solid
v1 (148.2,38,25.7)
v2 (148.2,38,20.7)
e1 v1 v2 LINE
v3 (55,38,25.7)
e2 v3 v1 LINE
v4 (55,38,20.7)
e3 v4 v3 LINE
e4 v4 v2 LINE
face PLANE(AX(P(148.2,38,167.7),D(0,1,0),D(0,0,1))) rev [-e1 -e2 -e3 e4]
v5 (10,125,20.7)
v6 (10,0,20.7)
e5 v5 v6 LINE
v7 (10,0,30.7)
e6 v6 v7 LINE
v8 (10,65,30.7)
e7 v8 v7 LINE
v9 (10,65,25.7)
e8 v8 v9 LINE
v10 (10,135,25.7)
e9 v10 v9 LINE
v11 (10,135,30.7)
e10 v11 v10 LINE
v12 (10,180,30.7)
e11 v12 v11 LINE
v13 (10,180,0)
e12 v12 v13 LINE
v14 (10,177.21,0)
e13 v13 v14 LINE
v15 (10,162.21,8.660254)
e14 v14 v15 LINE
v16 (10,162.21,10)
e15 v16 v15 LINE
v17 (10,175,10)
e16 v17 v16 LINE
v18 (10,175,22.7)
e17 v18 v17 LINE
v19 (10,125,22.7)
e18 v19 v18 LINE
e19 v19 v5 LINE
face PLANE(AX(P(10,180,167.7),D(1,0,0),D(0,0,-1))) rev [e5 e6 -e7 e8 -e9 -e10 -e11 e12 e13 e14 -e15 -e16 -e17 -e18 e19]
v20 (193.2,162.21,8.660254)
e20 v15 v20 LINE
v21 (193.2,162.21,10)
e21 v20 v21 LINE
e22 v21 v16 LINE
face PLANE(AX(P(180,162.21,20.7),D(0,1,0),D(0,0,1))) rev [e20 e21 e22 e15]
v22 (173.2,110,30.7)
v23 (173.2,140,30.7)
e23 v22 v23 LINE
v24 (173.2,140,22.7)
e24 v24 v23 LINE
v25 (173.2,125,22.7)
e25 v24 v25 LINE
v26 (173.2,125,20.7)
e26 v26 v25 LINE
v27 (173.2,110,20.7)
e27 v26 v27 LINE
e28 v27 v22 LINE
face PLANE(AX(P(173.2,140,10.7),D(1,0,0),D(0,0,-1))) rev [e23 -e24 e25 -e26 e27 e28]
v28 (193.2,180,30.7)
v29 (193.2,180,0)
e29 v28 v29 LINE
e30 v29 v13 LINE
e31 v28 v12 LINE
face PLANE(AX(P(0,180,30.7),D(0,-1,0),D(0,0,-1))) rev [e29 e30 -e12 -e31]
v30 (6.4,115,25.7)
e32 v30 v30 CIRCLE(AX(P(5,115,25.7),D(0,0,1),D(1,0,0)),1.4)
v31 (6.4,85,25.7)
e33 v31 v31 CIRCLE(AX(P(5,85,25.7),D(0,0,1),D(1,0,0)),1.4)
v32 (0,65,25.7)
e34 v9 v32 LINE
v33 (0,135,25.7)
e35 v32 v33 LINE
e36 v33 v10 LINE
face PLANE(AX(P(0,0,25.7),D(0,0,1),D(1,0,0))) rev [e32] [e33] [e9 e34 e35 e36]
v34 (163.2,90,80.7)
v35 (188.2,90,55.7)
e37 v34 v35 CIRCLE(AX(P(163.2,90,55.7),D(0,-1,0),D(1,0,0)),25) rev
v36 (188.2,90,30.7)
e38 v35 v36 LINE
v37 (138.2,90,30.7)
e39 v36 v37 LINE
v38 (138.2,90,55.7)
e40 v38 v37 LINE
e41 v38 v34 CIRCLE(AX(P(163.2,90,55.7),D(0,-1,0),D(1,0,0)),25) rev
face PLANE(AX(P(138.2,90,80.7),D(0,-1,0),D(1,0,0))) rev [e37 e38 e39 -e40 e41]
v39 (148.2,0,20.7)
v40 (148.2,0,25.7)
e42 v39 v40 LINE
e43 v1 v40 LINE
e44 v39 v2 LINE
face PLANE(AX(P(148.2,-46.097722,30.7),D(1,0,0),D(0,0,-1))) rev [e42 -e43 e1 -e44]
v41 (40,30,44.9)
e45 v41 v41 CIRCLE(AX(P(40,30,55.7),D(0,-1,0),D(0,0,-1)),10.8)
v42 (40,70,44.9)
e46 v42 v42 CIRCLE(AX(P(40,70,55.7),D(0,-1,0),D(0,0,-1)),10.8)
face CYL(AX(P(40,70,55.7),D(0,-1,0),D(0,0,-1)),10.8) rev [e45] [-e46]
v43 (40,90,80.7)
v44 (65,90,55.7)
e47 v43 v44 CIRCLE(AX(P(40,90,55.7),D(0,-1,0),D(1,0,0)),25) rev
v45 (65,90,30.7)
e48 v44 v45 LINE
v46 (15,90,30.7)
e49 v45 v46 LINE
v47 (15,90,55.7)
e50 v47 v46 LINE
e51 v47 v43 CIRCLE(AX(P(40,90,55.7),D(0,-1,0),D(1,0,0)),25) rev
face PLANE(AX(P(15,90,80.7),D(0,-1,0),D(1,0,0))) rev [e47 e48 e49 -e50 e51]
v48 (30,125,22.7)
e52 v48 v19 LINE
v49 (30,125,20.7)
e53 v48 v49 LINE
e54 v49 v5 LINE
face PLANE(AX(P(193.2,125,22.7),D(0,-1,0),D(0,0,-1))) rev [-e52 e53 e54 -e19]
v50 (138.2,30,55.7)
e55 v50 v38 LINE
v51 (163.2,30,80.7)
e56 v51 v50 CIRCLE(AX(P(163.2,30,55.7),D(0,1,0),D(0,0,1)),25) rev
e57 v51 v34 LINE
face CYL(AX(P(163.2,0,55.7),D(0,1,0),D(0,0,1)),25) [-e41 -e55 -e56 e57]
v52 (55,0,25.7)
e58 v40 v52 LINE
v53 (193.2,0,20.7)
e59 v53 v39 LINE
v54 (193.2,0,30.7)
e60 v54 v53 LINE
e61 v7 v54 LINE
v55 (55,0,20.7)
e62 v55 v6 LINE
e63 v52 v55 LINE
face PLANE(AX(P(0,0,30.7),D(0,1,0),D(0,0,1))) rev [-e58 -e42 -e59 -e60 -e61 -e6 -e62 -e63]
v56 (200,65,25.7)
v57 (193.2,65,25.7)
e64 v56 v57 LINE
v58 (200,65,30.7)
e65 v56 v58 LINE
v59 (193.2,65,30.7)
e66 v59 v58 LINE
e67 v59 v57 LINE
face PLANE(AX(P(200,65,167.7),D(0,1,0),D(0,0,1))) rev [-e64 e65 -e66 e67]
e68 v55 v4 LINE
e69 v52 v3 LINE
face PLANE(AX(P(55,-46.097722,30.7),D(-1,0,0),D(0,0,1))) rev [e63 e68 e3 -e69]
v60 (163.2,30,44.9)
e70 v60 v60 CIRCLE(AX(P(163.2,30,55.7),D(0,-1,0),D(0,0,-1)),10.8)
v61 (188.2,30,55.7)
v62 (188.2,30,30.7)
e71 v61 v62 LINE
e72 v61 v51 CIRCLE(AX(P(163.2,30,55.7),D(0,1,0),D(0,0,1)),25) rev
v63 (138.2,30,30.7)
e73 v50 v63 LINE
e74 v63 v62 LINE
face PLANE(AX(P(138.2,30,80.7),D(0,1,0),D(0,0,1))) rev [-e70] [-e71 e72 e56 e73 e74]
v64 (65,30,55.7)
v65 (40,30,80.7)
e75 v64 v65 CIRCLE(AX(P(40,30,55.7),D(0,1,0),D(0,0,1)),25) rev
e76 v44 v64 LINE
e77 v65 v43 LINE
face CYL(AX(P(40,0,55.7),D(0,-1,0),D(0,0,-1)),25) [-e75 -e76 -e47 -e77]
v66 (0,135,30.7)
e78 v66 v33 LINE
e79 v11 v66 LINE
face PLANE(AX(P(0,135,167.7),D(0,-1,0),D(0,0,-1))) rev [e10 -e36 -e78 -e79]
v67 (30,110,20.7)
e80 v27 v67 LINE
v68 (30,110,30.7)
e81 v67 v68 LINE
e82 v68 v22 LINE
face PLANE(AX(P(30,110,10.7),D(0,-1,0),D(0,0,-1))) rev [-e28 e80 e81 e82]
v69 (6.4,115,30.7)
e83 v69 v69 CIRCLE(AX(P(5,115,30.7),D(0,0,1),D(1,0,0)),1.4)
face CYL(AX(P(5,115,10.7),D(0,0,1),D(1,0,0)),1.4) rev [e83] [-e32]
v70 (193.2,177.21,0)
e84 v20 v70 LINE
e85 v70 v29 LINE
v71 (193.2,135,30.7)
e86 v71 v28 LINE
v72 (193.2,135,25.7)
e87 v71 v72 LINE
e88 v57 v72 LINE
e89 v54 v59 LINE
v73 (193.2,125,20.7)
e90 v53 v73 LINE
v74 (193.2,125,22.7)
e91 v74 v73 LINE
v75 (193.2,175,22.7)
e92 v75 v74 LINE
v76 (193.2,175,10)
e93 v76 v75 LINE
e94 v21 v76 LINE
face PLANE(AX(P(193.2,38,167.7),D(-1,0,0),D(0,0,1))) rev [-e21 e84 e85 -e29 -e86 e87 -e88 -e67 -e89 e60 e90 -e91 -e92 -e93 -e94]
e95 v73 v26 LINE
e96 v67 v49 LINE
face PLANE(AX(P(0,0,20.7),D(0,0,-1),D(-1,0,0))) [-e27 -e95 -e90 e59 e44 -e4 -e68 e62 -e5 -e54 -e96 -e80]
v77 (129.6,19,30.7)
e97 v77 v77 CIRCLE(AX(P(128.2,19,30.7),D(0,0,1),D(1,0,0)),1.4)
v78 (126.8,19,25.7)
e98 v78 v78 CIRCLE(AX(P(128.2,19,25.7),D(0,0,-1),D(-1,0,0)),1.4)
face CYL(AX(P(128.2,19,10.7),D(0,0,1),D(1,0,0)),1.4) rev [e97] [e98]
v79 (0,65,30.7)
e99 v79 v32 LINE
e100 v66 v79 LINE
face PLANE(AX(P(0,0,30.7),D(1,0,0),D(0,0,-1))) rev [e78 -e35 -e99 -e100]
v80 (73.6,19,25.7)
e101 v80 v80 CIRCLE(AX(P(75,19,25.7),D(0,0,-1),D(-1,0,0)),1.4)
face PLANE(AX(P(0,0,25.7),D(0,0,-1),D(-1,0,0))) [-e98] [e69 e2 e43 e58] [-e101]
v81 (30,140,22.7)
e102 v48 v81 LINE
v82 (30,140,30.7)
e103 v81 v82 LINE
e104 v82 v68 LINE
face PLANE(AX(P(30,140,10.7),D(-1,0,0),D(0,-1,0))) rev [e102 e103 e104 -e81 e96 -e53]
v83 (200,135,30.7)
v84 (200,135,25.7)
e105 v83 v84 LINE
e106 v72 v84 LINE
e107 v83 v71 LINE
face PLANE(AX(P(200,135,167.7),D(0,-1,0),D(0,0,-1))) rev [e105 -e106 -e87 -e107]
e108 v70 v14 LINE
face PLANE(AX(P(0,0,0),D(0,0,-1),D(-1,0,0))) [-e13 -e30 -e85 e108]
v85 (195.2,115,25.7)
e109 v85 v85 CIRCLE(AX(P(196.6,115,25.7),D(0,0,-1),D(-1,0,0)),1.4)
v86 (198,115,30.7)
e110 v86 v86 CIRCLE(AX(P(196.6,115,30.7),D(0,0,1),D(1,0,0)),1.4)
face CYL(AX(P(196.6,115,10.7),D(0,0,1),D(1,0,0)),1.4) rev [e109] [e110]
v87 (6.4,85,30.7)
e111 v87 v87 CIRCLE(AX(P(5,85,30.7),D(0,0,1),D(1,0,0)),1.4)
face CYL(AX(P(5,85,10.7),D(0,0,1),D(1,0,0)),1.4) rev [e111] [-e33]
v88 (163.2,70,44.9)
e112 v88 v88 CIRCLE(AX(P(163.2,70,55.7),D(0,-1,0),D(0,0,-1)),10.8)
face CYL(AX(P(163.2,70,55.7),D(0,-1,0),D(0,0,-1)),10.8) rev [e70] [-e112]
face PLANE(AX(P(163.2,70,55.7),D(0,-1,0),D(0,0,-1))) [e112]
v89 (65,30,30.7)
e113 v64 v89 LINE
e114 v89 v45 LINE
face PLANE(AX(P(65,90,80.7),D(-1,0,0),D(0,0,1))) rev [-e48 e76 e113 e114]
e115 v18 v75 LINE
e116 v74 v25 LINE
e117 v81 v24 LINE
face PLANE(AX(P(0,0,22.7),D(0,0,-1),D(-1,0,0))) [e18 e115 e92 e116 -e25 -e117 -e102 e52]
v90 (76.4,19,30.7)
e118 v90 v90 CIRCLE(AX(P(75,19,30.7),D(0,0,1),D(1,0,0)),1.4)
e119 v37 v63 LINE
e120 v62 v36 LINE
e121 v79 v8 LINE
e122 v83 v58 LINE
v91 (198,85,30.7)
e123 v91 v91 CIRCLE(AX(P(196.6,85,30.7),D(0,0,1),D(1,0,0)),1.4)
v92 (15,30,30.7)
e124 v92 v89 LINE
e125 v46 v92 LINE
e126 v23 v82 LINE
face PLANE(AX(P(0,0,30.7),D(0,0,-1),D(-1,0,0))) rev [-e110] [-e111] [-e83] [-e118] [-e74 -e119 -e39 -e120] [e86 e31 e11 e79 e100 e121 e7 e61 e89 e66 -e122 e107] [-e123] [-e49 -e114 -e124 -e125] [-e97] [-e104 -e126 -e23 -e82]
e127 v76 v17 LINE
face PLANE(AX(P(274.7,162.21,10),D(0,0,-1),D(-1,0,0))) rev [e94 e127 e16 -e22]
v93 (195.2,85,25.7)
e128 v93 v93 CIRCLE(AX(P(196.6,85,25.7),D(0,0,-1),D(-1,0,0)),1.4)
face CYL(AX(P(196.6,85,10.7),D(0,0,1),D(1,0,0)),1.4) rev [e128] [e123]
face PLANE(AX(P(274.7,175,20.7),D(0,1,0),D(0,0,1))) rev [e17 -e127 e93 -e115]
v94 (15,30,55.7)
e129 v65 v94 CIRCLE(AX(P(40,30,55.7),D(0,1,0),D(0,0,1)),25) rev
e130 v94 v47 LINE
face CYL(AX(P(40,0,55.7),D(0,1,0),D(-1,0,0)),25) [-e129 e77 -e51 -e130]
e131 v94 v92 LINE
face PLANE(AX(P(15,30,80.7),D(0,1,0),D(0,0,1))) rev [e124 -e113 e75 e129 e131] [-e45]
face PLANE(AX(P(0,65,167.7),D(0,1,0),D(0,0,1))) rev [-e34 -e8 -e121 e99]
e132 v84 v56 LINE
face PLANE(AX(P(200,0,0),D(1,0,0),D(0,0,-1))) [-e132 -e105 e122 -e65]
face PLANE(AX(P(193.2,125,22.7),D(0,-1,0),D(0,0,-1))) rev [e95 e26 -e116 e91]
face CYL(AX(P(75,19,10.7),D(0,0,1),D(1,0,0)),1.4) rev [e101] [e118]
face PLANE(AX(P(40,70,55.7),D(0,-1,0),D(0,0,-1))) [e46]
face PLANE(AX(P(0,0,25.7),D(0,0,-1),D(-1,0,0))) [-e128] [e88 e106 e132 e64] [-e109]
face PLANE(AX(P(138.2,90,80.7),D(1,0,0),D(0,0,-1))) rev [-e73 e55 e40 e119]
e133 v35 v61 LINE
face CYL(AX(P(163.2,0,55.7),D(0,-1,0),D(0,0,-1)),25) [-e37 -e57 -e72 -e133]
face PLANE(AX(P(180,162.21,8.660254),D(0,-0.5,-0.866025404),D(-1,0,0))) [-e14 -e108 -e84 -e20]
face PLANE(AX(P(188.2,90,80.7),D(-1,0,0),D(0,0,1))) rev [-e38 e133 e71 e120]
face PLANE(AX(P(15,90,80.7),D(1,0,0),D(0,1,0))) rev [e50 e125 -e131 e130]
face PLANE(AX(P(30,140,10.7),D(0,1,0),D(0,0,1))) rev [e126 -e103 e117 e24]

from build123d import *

# Parameters (mm, degrees)
CROQUIS1_W                 = 180
CROQUIS1_H                 = 180
SALIENTE_EXTRUIR1_DEPTH    = 30.7
CROQUIS2_W                 = 180
CROQUIS2_H                 = 162.21
CORTAR_EXTRUIR1_DEPTH      = 20.7
CROQUIS3_W                 = 10.7
CROQUIS3_H                 = 12.79
CORTAR_EXTRUIR2_DEPTH      = 274.7
SALIENTE_EXTRUIR2_DEPTH    = 20
CORTAR_EXTRUIR3_DEPTH      = 147
CORTAR_EXTRUIR3_DEPTH_BACK = 147
CROQUIS5_W                 = 10
CROQUIS5_H                 = 45
CROQUIS5_W_2               = 6.8
CROQUIS6_W                 = 93.2
CROQUIS6_H                 = 38
CROQUIS6_W_2               = 6.8
CROQUIS6_H_2               = 70
CROQUIS6_W_3               = 10
CORTAR_EXTRUIR4_DEPTH      = 5
CROQUIS7_W                 = 183.2
CROQUIS7_H                 = 50
CORTAR_EXTRUIR5_DEPTH      = 2
CROQUIS8_W                 = 45
CROQUIS8_H                 = 10
SALIENTE_EXTRUIR3_DEPTH    = 38
CROQUIS9_R                 = 1.4
CROQUIS9_W                 = 143.2
CROQUIS9_H                 = 30
CORTAR_EXTRUIR6_DEPTH      = 20
CHAFL_N1_SIZE              = 15
CHAFL_N1_SIZE2             = 8.660254038
CROQUIS10_W                = 50
CROQUIS10_H                = 60
SALIENTE_EXTRUIR4_DEPTH    = 50
REDONDEO1_R                = 25
CROQUIS11_R                = 10.8
CORTAR_EXTRUIR7_DEPTH      = 40


with BuildPart() as part:
    # Croquis1 → Saliente-Extruir1 (new body)
    with BuildSketch(Plane.XY):
        with Locations((90, 90)):
            Rectangle(CROQUIS1_W, CROQUIS1_H)
    extrude(amount=SALIENTE_EXTRUIR1_DEPTH)

    # Croquis2 → Cortar-Extruir1 (cut)
    with BuildSketch(Plane(origin=(0, 0, 0), x_dir=(-1, 0, 0), z_dir=(0, 0, -1))):
        with Locations((-90, 81.105)):
            Rectangle(CROQUIS2_W, CROQUIS2_H)
    extrude(amount=-CORTAR_EXTRUIR1_DEPTH, mode=Mode.SUBTRACT)

    # Croquis3 → Cortar-Extruir2 (cut)
    with BuildSketch(Plane.ZY):
        with Locations((15.35, 168.605)):
            Rectangle(CROQUIS3_W, CROQUIS3_H)
    extrude(amount=-CORTAR_EXTRUIR2_DEPTH, mode=Mode.SUBTRACT)

    # Croquis4 → Saliente-Extruir2 (add)
    with BuildSketch(Plane(origin=(180, 0, 0), x_dir=(0, 0, -1), z_dir=(1, 0, 0))):
        Polygon((-20.7, 0), (-20.7, 175), (-10, 175), (-10, 162.21), (0, 162.21), (0, 180), (-30.7, 180), (-30.7, 0), align=None)
    extrude(amount=SALIENTE_EXTRUIR2_DEPTH)

    # Croquis5 → Cortar-Extruir3 (cut, two sides: drawn at the far end of the back side and taken through both)
    with BuildSketch(Plane(origin=(0, 0, 20.7), x_dir=(-1, 0, 0), z_dir=(0, 0, -1)).offset(-CORTAR_EXTRUIR3_DEPTH_BACK)):
        Polygon((-55, 38), (-10, 38), (-10, 65), (0, 65), (0, 38), (0, 0), (-55, 0), align=None)
        Polygon((-148.2, 38), (-193.2, 38), (-193.2, 65), (-200, 65), (-200, 38), (-200, 0), (-148.2, 0), align=None)
        with Locations((-5, 157.5)):
            Rectangle(CROQUIS5_W, CROQUIS5_H)
        with Locations((-196.6, 157.5)):
            Rectangle(CROQUIS5_W_2, CROQUIS5_H)
    extrude(amount=CORTAR_EXTRUIR3_DEPTH + CORTAR_EXTRUIR3_DEPTH_BACK, mode=Mode.SUBTRACT)

    # Croquis6 → Cortar-Extruir4 (cut)
    with BuildSketch(Plane(origin=(0, 0, 20.7), x_dir=(-1, 0, 0), z_dir=(0, 0, -1))):
        with Locations((-101.6, 19)):
            Rectangle(CROQUIS6_W, CROQUIS6_H)
        with Locations((-196.6, 100)):
            Rectangle(CROQUIS6_W_2, CROQUIS6_H_2)
        with Locations((-5, 100)):
            Rectangle(CROQUIS6_W_3, CROQUIS6_H_2)
    extrude(amount=-CORTAR_EXTRUIR4_DEPTH, mode=Mode.SUBTRACT)

    # Croquis7 → Cortar-Extruir5 (cut)
    with BuildSketch(Plane(origin=(0, 0, 20.7), x_dir=(-1, 0, 0), z_dir=(0, 0, -1))):
        with Locations((-101.6, 150)):
            Rectangle(CROQUIS7_W, CROQUIS7_H)
    extrude(amount=-CORTAR_EXTRUIR5_DEPTH, mode=Mode.SUBTRACT)

    # Croquis8 → Saliente-Extruir3 (add)
    with BuildSketch(Plane.XZ.offset(-38)):
        with Locations((32.5, 25.7)):
            Rectangle(CROQUIS8_W, CROQUIS8_H)
        with Locations((170.7, 25.7)):
            Rectangle(CROQUIS8_W, CROQUIS8_H)
    extrude(amount=SALIENTE_EXTRUIR3_DEPTH)

    # Croquis9 → Cortar-Extruir6 (cut)
    with BuildSketch(Plane.XY.offset(30.7)):
        with Locations((5, 115)):
            Circle(CROQUIS9_R)
        with Locations((5, 85)):
            Circle(CROQUIS9_R)
        with Locations((196.6, 115)):
            Circle(CROQUIS9_R)
        with Locations((196.6, 85)):
            Circle(CROQUIS9_R)
        with Locations((128.2, 19)):
            Circle(CROQUIS9_R)
        with Locations((75, 19)):
            Circle(CROQUIS9_R)
        with Locations((101.6, 125)):
            Rectangle(CROQUIS9_W, CROQUIS9_H)
    extrude(amount=-CORTAR_EXTRUIR6_DEPTH, mode=Mode.SUBTRACT)

    # Chaflán1
    chafl_n1_edges = [part.edges().sort_by_distance(p)[0] for p in [
        (101.6, 162.21, 0),
    ]]
    chafl_n1_side = [part.faces().sort_by_distance(p)[0] for p in [
        (101.6, 171.105, 0),
    ]]
    chamfer(chafl_n1_edges, length=CHAFL_N1_SIZE, length2=CHAFL_N1_SIZE2, reference=chafl_n1_side[0])

    # Croquis10 → Saliente-Extruir4 (add)
    with BuildSketch(Plane.XY.offset(30.7)):
        with Locations((163.2, 60)):
            Rectangle(CROQUIS10_W, CROQUIS10_H)
        with Locations((40, 60)):
            Rectangle(CROQUIS10_W, CROQUIS10_H)
    extrude(amount=SALIENTE_EXTRUIR4_DEPTH)

    # Redondeo1
    redondeo1_edges = [part.edges().sort_by_distance(p)[0] for p in [
        (15, 60, 80.7),
        (65, 60, 80.7),
        (138.2, 60, 80.7),
        (188.2, 60, 80.7),
    ]]
    fillet(redondeo1_edges, radius=REDONDEO1_R - 0.0001)  # a hair under: the kernel refuses the full size

    # Croquis11 → Cortar-Extruir7 (cut)
    with BuildSketch(Plane.XZ.offset(-30)):
        with Locations(Location((163.2, 55.7, 0), (0, 0, 270))):
            Circle(CROQUIS11_R)
        with Locations(Location((40, 55.7, 0), (0, 0, 270))):
            Circle(CROQUIS11_R)
    extrude(amount=-CORTAR_EXTRUIR7_DEPTH, mode=Mode.SUBTRACT)


solid = part.part
